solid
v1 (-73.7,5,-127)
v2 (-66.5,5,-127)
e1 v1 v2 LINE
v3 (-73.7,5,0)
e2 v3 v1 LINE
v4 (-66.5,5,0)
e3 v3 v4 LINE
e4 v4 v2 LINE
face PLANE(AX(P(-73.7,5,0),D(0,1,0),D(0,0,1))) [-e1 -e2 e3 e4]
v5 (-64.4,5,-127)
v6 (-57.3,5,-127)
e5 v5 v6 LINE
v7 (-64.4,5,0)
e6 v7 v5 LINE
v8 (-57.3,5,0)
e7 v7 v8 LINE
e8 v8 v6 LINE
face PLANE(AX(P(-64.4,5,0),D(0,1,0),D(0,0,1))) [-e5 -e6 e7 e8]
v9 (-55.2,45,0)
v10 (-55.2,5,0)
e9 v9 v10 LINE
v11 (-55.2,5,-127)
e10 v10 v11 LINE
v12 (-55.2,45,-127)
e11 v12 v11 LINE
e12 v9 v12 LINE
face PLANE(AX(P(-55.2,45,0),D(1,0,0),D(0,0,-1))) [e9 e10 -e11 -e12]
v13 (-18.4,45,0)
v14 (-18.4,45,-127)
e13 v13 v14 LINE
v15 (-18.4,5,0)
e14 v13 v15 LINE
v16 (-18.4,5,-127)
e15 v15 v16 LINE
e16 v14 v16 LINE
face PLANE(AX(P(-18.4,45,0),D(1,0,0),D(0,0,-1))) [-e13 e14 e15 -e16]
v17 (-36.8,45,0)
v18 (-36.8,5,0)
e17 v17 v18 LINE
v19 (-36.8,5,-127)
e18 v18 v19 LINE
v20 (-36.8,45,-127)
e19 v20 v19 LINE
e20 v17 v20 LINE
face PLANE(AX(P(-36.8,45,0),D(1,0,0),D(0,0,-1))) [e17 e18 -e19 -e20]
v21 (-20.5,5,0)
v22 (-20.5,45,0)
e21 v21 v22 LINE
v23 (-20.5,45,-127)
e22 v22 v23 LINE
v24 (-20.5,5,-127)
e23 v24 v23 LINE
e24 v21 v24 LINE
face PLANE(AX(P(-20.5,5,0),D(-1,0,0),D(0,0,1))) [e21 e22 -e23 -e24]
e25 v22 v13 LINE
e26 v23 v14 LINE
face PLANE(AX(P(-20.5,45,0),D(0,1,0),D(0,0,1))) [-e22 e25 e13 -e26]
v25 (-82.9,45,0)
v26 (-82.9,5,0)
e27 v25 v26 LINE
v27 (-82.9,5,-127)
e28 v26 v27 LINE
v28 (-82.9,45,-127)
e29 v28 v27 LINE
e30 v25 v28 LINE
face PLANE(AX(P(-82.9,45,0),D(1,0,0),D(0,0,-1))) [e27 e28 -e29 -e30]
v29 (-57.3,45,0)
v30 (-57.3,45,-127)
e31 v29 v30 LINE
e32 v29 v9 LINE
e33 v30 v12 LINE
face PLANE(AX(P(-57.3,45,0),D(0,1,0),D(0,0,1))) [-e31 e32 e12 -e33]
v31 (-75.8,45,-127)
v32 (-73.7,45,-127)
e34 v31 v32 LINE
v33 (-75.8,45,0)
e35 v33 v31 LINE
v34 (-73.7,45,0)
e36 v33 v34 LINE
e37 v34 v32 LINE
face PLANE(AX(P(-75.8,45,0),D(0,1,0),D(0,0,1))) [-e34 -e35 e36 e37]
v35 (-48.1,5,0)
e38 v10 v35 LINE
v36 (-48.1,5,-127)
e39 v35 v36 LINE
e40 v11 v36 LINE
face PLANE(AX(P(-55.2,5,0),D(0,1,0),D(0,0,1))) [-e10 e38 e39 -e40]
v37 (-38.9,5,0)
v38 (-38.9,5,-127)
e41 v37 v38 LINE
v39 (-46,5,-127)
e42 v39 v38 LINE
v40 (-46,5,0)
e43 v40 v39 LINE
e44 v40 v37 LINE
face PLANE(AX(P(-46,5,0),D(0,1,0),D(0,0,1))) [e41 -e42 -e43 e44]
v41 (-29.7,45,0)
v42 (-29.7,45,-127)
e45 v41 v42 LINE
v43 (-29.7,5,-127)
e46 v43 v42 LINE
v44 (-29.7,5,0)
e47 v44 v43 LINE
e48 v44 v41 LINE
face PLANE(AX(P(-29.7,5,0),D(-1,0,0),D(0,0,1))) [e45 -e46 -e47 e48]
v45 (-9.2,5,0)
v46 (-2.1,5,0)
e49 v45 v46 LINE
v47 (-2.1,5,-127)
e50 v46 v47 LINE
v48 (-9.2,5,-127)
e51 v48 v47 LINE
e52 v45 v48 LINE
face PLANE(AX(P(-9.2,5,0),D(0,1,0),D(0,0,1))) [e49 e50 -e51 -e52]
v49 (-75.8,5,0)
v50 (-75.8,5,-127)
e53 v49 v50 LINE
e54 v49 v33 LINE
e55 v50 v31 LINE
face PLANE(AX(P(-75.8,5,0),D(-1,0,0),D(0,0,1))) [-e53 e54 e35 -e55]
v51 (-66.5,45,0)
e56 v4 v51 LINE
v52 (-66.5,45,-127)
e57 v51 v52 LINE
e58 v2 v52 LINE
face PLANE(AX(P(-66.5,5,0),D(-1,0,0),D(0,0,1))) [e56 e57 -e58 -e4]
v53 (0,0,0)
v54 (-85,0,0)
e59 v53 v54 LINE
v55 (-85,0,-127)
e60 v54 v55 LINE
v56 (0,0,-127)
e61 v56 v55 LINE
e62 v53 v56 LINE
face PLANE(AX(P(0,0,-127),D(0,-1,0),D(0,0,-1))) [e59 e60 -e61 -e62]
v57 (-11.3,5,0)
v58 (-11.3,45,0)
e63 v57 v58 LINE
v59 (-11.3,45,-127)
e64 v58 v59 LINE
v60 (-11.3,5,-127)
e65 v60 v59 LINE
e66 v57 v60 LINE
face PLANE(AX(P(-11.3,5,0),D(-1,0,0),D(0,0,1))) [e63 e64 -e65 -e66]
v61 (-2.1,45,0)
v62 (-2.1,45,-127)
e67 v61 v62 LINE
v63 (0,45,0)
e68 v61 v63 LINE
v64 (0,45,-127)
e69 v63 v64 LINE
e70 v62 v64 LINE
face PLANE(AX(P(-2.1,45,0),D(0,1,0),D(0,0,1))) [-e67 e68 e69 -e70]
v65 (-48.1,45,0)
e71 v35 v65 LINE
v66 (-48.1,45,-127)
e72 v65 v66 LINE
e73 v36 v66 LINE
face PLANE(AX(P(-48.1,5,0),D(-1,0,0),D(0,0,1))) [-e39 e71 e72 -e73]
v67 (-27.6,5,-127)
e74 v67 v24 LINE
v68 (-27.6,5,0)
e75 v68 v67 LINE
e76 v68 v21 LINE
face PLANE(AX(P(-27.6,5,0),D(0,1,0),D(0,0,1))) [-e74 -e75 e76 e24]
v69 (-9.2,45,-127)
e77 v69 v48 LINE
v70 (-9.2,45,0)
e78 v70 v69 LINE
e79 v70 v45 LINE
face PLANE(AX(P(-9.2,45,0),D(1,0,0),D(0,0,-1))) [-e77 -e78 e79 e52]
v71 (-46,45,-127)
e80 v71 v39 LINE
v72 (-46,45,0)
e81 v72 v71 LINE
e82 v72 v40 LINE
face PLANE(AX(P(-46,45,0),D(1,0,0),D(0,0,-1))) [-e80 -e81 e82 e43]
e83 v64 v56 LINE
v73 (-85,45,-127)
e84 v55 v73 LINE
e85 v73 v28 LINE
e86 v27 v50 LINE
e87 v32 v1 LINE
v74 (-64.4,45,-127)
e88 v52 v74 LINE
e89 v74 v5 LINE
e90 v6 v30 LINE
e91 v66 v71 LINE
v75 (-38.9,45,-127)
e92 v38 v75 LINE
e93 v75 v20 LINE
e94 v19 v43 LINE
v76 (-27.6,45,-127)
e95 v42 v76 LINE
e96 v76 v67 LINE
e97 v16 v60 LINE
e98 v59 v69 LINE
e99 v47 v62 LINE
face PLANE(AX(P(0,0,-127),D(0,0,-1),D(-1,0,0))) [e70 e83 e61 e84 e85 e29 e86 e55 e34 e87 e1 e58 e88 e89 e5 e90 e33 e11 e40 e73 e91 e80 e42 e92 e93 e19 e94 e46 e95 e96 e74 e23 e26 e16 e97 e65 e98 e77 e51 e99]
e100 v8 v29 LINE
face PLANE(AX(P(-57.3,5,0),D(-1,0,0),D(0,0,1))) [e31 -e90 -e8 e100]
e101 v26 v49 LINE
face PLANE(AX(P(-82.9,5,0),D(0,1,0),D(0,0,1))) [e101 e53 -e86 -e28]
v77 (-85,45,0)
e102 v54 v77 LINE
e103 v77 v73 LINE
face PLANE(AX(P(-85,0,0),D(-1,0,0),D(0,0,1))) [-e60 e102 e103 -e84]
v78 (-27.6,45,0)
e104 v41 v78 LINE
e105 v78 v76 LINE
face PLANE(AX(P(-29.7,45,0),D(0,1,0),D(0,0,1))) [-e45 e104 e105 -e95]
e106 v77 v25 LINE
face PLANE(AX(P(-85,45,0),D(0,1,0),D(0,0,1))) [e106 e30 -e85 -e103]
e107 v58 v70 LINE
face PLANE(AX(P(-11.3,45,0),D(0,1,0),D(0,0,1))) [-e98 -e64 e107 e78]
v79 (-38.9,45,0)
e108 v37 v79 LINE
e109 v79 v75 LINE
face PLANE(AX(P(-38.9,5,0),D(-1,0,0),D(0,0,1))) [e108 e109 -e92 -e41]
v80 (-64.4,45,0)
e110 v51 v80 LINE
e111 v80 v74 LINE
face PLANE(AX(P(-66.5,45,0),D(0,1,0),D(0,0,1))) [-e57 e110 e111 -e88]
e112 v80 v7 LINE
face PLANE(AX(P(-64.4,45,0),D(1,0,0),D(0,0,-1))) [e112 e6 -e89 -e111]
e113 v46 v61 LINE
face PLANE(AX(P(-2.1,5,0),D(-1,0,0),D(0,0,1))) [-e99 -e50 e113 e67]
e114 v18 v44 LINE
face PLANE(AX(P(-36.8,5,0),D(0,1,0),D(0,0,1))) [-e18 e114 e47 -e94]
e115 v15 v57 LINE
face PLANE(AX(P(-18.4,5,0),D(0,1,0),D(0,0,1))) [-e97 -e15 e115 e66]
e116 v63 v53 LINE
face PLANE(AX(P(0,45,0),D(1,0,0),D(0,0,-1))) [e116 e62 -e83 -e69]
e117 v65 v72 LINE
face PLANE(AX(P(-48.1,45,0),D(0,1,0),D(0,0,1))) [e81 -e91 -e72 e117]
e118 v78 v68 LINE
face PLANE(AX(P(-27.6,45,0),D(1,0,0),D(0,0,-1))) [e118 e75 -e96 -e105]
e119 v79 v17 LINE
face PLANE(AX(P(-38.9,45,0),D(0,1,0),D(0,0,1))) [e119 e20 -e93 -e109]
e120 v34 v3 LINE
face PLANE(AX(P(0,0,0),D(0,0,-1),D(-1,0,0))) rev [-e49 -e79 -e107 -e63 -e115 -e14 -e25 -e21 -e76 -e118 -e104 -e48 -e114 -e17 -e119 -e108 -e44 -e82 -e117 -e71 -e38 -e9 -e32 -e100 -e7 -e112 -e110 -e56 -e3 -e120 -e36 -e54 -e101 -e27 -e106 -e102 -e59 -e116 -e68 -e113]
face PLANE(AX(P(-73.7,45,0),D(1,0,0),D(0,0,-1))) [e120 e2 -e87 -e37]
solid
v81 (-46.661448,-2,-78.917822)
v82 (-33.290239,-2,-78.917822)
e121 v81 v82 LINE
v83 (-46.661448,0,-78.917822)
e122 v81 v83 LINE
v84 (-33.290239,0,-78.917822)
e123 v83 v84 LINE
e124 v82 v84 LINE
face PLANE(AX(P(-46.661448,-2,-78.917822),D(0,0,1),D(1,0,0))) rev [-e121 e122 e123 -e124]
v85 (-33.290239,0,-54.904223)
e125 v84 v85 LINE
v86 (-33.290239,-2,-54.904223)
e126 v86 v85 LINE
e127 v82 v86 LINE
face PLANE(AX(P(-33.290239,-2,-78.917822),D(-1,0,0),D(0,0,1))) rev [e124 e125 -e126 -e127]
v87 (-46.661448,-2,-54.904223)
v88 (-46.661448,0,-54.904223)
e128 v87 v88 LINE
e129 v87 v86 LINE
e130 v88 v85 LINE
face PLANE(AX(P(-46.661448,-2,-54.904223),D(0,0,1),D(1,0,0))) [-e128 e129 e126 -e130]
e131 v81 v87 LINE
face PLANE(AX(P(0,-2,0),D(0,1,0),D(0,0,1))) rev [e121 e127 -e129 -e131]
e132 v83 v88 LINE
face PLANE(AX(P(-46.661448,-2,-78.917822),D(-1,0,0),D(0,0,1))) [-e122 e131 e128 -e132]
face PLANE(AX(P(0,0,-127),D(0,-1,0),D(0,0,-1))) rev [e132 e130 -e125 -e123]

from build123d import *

# Parameters (mm, degrees)
BOSS_EXTRUDE1_DEPTH = 127
SKETCH4_W           = 13.371208708
SKETCH4_H           = 24.013599311
THERMAL_PASTE_DEPTH = 2


with BuildPart() as part:
    # Sketch1 → Boss-Extrude1 (new body)
    with BuildSketch(Plane(origin=(0, 0, -127), x_dir=(-1, 0, 0), z_dir=(0, 0, -1))):
        Polygon((85, 45), (82.9, 45), (82.9, 5), (75.8, 5), (75.8, 45), (73.7, 45), (73.7, 5), (66.5, 5), (66.5, 45), (64.4, 45), (64.4, 5), (57.3, 5), (57.3, 45), (55.2, 45), (55.2, 5), (48.1, 5), (48.1, 45), (46, 45), (46, 5), (38.9, 5), (38.9, 45), (36.8, 45), (36.8, 5), (29.7, 5), (29.7, 45), (27.6, 45), (27.6, 5), (20.5, 5), (20.5, 45), (18.4, 45), (18.4, 5), (11.3, 5), (11.3, 45), (9.2, 45), (9.2, 5), (2.1, 5), (2.1, 45), (0, 45), (0, 0), (85, 0), align=None)
    extrude(amount=-BOSS_EXTRUDE1_DEPTH)

    # Sketch4 → thermal-paste (add)
    with BuildSketch(Plane(origin=(0, 0, 0), x_dir=(-1, 0, 0), z_dir=(0, -1, 0))):
        with Locations((39.975843254, 66.911022629)):
            Rectangle(SKETCH4_W, SKETCH4_H)
    extrude(amount=THERMAL_PASTE_DEPTH)


with BuildPart() as body_2:
    # Split1: the piece on the far side of the plane
    add(part.part)
    split(bisect_by=Plane(origin=(0, 0, 0), x_dir=(0, 0, -1), z_dir=(0, -1, 0)), keep=Keep.BOTTOM)


with BuildPart() as part_1:
    add(part.part)

    # Split1
    split(bisect_by=Plane(origin=(0, 0, 0), x_dir=(0, 0, -1), z_dir=(0, -1, 0)), keep=Keep.TOP)


solid = Compound([body_2.part, part_1.part])
